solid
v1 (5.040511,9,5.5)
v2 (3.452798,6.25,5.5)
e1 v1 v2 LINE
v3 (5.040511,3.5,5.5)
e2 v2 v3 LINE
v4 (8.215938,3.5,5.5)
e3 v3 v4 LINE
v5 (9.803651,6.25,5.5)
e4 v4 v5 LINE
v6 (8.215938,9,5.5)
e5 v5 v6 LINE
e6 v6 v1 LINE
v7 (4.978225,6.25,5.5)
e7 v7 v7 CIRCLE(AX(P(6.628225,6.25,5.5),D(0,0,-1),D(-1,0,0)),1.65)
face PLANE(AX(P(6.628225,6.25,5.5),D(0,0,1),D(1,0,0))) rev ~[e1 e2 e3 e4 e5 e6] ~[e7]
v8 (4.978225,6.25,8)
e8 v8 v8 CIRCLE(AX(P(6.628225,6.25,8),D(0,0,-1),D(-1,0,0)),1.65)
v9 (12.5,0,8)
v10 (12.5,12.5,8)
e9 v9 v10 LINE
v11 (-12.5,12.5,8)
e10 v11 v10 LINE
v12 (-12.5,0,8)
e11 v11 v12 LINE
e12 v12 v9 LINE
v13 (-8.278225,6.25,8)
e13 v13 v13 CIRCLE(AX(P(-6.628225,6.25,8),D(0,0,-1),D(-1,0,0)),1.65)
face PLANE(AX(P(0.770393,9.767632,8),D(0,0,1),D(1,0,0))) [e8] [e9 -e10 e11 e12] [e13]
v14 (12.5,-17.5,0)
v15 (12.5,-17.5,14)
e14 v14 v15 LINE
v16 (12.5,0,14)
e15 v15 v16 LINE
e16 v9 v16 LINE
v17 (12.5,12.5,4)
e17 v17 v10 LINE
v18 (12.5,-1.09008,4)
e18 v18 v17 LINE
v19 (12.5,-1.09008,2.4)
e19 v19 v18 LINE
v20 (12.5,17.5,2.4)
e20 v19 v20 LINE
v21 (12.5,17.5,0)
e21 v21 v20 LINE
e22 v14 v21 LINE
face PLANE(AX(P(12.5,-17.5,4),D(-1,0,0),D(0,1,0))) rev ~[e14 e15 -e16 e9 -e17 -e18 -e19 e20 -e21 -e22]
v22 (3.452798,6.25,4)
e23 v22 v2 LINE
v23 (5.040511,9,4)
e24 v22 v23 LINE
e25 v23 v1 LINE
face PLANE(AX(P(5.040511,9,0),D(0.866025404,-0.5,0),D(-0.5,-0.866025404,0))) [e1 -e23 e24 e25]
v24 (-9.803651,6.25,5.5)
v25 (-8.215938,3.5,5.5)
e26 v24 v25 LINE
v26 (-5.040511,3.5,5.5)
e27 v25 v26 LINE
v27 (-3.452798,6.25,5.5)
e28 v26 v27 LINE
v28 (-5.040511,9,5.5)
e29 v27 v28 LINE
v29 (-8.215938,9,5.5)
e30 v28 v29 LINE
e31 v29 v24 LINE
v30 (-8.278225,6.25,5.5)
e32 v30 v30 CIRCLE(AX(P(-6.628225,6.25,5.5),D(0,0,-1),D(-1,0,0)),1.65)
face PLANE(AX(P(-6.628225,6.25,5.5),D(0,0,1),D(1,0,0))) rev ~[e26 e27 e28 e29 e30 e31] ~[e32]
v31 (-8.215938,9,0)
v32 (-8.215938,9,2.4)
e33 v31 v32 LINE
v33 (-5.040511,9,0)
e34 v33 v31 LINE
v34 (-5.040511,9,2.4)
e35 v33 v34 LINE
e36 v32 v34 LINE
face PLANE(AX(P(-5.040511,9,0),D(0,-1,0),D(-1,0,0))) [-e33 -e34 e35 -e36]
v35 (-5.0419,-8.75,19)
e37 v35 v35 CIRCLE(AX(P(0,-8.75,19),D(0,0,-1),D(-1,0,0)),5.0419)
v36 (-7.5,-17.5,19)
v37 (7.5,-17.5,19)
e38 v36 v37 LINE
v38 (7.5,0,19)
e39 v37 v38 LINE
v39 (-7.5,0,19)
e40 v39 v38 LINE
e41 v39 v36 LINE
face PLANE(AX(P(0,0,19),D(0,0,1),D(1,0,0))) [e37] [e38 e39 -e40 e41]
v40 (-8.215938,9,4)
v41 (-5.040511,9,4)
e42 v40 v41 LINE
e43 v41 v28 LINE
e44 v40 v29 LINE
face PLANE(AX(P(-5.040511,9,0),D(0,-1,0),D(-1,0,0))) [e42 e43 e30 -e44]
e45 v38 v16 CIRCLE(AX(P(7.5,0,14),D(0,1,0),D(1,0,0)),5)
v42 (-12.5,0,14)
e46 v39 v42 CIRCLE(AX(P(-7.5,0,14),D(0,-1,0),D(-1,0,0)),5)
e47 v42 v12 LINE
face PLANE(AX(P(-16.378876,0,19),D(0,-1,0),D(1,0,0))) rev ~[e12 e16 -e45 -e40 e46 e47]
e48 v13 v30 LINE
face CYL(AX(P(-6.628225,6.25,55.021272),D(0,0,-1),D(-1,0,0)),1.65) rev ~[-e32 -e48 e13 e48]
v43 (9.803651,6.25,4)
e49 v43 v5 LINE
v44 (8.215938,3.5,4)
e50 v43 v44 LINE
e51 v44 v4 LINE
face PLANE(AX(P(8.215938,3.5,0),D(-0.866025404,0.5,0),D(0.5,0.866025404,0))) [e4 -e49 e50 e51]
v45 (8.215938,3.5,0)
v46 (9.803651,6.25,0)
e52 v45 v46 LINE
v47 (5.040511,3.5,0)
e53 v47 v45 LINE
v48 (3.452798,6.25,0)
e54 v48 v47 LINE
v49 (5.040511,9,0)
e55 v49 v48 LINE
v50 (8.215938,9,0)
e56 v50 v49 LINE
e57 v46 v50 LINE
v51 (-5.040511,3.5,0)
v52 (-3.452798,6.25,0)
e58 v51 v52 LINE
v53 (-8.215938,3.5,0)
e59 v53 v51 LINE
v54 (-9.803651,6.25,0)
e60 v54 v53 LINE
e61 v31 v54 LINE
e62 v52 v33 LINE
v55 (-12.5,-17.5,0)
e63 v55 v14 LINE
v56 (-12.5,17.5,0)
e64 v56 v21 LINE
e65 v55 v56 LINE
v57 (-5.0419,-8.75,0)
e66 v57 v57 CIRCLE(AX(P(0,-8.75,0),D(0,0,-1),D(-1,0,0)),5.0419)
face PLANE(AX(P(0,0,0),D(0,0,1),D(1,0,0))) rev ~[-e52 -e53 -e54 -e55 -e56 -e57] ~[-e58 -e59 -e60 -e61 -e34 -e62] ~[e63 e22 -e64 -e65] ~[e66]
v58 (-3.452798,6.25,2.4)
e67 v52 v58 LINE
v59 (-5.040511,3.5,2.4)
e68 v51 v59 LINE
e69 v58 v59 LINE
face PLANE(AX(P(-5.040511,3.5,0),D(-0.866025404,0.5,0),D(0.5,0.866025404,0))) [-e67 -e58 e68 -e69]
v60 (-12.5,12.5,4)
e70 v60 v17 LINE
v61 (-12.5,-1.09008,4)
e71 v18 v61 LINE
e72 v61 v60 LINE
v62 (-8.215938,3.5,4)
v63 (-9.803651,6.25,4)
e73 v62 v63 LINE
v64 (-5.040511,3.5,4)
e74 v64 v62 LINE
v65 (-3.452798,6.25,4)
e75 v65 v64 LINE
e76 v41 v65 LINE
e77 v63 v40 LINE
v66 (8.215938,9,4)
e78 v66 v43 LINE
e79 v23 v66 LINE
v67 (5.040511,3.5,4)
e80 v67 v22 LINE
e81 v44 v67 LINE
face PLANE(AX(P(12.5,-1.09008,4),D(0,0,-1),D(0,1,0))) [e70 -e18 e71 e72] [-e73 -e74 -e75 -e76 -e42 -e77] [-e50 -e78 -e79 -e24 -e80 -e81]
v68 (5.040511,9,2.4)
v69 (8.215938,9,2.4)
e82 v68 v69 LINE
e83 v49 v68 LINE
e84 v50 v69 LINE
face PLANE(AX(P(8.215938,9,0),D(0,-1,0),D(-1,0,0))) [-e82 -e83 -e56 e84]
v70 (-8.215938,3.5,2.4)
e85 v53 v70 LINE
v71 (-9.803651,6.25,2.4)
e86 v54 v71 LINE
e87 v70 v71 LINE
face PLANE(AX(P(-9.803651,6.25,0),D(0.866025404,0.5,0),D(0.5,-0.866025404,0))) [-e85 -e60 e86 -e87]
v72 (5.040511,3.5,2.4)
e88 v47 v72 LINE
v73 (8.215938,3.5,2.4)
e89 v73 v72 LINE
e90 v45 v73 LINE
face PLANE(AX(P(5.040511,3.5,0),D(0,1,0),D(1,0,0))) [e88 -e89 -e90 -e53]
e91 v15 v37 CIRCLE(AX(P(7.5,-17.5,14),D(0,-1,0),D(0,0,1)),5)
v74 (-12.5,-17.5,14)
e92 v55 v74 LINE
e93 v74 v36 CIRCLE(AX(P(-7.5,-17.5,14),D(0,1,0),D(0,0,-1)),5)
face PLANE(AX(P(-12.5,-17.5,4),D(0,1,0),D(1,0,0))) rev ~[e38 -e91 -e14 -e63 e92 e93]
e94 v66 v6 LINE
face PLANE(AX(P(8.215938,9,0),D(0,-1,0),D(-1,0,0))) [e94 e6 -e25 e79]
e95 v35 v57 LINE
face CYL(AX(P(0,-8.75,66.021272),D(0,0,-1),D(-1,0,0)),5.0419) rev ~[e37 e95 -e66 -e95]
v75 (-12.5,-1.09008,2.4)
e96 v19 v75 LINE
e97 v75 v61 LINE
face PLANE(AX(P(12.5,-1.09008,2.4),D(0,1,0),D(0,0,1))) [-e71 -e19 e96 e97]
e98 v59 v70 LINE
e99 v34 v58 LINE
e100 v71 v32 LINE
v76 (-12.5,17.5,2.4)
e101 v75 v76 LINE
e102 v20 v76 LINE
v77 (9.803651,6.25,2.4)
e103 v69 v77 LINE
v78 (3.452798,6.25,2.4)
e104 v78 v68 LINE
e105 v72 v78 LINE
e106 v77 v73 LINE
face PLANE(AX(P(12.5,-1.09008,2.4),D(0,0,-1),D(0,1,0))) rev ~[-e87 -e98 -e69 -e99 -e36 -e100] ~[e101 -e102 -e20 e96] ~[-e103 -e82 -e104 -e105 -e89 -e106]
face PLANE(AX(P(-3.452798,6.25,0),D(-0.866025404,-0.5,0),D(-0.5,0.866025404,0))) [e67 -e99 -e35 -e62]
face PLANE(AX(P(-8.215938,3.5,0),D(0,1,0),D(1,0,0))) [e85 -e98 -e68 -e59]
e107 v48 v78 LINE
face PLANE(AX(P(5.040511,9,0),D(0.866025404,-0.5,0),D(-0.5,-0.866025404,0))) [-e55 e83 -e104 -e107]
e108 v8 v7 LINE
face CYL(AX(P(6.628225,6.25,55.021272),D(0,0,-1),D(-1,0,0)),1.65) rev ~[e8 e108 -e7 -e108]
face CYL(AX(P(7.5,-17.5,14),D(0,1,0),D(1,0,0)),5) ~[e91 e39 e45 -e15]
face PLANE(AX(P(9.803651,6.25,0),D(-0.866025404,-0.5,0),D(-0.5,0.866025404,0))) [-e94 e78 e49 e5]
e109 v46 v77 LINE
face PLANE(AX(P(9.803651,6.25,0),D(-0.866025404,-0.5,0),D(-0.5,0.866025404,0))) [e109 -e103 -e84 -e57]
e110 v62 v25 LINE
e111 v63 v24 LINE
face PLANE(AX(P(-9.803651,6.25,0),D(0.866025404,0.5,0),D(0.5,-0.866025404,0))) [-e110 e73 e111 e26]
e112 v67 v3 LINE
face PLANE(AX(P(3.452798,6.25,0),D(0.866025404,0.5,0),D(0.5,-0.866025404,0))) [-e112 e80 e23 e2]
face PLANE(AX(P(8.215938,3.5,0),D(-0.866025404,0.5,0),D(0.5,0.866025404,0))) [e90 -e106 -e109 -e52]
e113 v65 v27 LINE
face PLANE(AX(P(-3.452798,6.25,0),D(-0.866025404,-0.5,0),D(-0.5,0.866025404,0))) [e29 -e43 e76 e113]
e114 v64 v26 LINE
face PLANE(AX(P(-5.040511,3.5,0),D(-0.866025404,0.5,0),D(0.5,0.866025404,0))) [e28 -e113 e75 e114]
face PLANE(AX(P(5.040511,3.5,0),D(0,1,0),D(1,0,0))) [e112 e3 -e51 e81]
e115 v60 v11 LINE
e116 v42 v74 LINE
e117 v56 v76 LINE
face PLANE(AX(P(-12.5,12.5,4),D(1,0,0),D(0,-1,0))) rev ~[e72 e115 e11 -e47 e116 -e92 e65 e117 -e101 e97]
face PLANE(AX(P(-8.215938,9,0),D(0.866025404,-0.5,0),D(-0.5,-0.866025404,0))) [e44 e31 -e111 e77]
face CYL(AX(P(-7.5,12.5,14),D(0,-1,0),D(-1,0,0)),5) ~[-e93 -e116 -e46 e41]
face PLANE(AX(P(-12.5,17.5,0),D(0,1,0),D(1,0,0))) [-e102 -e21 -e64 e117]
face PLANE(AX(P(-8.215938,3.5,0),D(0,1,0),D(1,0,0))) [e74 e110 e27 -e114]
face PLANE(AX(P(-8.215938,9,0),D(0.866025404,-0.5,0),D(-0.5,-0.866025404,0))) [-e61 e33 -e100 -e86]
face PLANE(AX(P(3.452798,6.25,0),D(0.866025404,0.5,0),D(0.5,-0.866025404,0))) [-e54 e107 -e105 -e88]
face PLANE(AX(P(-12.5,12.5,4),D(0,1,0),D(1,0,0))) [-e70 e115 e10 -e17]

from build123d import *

# Parameters (mm, degrees)
F0_W      = 25
F0_H      = 35
F1_DEPTH  = 4
F2_W      = 25
F2_H      = 25
F2_H_2    = 5
F3_DEPTH  = 15
F4_R      = 5
F5_W      = 15
F5_H      = 12.5
F6_DEPTH  = 11
F9_D      = 3.3
F11_DEPTH = 5.5
F7_W      = 20
F7_H      = 1.6
F12_DEPTH = 25
F14_D     = 10.0838


# Not quite as in the source:
# - a feature names something its author has since deleted; it is built from what else it names


with BuildPart() as f1:
    # F0 (on Top) → F1 (new body)
    with BuildSketch(Plane.XY):
        Rectangle(F0_W, F0_H)
    extrude(amount=F1_DEPTH)

    # F2 (on face) → F3 (join)
    with BuildSketch(Plane.XY.offset(4)):
        Rectangle(F2_W, F2_H)
        with Locations((0, -15)):
            Rectangle(F2_W, F2_H_2)
    extrude(amount=F3_DEPTH)

    # F4
    f4_edges = [f1.edges().sort_by_distance(p)[0] for p in [
        (-12.5, -2.5, 19),
        (12.5, -2.5, 19),
    ]]
    fillet(f4_edges, radius=F4_R)

    # F5 (on face) → F6 (cut)
    with BuildSketch(Plane.XY.offset(19)):
        Polygon((-16.3788758218, 17.6315885037), (-16.3788758218, 0), (-7.5, 0), (-7.5, 12.5), (7.5, 12.5), (7.5, 0), (18.287928775, 0), (18.287928775, 17.6315885037), align=None)
        with Locations((0, 6.25)):
            Rectangle(F5_W, F5_H)
    extrude(amount=-F6_DEPTH, mode=Mode.SUBTRACT)

    # F9 (through all)
    with Locations(Plane.XY.offset(8)):
        with Locations((6.6282246262, 6.25), (-6.6282246262, 6.25)):
            Hole(F9_D / 2)

    # F10 (on face) → F11 (cut)
    with BuildSketch(Plane.XY):
        Polygon((-5.0405113859, 3.5), (-3.4527981456, 6.25), (-5.0405113859, 9), (-8.2159378665, 9), (-9.8036511067, 6.25), (-8.2159378665, 3.5), align=None)
        Polygon((5.0405113859, 9), (3.4527981456, 6.25), (5.0405113859, 3.5), (8.2159378665, 3.5), (9.8036511067, 6.25), (8.2159378665, 9), align=None)
    extrude(amount=F11_DEPTH, mode=Mode.SUBTRACT)

    # F7 (on face) → F12 (cut)
    with BuildSketch(Plane.YZ.offset(12.5)):
        with Locations((8.9099199928, 3.2)):
            Rectangle(F7_W, F7_H)
    extrude(amount=-F12_DEPTH, mode=Mode.SUBTRACT)

    # F14 (through all)
    with Locations(Plane.XY.offset(19)):
        with Locations((0, -8.75)):
            Hole(F14_D / 2)


solid = f1.part
